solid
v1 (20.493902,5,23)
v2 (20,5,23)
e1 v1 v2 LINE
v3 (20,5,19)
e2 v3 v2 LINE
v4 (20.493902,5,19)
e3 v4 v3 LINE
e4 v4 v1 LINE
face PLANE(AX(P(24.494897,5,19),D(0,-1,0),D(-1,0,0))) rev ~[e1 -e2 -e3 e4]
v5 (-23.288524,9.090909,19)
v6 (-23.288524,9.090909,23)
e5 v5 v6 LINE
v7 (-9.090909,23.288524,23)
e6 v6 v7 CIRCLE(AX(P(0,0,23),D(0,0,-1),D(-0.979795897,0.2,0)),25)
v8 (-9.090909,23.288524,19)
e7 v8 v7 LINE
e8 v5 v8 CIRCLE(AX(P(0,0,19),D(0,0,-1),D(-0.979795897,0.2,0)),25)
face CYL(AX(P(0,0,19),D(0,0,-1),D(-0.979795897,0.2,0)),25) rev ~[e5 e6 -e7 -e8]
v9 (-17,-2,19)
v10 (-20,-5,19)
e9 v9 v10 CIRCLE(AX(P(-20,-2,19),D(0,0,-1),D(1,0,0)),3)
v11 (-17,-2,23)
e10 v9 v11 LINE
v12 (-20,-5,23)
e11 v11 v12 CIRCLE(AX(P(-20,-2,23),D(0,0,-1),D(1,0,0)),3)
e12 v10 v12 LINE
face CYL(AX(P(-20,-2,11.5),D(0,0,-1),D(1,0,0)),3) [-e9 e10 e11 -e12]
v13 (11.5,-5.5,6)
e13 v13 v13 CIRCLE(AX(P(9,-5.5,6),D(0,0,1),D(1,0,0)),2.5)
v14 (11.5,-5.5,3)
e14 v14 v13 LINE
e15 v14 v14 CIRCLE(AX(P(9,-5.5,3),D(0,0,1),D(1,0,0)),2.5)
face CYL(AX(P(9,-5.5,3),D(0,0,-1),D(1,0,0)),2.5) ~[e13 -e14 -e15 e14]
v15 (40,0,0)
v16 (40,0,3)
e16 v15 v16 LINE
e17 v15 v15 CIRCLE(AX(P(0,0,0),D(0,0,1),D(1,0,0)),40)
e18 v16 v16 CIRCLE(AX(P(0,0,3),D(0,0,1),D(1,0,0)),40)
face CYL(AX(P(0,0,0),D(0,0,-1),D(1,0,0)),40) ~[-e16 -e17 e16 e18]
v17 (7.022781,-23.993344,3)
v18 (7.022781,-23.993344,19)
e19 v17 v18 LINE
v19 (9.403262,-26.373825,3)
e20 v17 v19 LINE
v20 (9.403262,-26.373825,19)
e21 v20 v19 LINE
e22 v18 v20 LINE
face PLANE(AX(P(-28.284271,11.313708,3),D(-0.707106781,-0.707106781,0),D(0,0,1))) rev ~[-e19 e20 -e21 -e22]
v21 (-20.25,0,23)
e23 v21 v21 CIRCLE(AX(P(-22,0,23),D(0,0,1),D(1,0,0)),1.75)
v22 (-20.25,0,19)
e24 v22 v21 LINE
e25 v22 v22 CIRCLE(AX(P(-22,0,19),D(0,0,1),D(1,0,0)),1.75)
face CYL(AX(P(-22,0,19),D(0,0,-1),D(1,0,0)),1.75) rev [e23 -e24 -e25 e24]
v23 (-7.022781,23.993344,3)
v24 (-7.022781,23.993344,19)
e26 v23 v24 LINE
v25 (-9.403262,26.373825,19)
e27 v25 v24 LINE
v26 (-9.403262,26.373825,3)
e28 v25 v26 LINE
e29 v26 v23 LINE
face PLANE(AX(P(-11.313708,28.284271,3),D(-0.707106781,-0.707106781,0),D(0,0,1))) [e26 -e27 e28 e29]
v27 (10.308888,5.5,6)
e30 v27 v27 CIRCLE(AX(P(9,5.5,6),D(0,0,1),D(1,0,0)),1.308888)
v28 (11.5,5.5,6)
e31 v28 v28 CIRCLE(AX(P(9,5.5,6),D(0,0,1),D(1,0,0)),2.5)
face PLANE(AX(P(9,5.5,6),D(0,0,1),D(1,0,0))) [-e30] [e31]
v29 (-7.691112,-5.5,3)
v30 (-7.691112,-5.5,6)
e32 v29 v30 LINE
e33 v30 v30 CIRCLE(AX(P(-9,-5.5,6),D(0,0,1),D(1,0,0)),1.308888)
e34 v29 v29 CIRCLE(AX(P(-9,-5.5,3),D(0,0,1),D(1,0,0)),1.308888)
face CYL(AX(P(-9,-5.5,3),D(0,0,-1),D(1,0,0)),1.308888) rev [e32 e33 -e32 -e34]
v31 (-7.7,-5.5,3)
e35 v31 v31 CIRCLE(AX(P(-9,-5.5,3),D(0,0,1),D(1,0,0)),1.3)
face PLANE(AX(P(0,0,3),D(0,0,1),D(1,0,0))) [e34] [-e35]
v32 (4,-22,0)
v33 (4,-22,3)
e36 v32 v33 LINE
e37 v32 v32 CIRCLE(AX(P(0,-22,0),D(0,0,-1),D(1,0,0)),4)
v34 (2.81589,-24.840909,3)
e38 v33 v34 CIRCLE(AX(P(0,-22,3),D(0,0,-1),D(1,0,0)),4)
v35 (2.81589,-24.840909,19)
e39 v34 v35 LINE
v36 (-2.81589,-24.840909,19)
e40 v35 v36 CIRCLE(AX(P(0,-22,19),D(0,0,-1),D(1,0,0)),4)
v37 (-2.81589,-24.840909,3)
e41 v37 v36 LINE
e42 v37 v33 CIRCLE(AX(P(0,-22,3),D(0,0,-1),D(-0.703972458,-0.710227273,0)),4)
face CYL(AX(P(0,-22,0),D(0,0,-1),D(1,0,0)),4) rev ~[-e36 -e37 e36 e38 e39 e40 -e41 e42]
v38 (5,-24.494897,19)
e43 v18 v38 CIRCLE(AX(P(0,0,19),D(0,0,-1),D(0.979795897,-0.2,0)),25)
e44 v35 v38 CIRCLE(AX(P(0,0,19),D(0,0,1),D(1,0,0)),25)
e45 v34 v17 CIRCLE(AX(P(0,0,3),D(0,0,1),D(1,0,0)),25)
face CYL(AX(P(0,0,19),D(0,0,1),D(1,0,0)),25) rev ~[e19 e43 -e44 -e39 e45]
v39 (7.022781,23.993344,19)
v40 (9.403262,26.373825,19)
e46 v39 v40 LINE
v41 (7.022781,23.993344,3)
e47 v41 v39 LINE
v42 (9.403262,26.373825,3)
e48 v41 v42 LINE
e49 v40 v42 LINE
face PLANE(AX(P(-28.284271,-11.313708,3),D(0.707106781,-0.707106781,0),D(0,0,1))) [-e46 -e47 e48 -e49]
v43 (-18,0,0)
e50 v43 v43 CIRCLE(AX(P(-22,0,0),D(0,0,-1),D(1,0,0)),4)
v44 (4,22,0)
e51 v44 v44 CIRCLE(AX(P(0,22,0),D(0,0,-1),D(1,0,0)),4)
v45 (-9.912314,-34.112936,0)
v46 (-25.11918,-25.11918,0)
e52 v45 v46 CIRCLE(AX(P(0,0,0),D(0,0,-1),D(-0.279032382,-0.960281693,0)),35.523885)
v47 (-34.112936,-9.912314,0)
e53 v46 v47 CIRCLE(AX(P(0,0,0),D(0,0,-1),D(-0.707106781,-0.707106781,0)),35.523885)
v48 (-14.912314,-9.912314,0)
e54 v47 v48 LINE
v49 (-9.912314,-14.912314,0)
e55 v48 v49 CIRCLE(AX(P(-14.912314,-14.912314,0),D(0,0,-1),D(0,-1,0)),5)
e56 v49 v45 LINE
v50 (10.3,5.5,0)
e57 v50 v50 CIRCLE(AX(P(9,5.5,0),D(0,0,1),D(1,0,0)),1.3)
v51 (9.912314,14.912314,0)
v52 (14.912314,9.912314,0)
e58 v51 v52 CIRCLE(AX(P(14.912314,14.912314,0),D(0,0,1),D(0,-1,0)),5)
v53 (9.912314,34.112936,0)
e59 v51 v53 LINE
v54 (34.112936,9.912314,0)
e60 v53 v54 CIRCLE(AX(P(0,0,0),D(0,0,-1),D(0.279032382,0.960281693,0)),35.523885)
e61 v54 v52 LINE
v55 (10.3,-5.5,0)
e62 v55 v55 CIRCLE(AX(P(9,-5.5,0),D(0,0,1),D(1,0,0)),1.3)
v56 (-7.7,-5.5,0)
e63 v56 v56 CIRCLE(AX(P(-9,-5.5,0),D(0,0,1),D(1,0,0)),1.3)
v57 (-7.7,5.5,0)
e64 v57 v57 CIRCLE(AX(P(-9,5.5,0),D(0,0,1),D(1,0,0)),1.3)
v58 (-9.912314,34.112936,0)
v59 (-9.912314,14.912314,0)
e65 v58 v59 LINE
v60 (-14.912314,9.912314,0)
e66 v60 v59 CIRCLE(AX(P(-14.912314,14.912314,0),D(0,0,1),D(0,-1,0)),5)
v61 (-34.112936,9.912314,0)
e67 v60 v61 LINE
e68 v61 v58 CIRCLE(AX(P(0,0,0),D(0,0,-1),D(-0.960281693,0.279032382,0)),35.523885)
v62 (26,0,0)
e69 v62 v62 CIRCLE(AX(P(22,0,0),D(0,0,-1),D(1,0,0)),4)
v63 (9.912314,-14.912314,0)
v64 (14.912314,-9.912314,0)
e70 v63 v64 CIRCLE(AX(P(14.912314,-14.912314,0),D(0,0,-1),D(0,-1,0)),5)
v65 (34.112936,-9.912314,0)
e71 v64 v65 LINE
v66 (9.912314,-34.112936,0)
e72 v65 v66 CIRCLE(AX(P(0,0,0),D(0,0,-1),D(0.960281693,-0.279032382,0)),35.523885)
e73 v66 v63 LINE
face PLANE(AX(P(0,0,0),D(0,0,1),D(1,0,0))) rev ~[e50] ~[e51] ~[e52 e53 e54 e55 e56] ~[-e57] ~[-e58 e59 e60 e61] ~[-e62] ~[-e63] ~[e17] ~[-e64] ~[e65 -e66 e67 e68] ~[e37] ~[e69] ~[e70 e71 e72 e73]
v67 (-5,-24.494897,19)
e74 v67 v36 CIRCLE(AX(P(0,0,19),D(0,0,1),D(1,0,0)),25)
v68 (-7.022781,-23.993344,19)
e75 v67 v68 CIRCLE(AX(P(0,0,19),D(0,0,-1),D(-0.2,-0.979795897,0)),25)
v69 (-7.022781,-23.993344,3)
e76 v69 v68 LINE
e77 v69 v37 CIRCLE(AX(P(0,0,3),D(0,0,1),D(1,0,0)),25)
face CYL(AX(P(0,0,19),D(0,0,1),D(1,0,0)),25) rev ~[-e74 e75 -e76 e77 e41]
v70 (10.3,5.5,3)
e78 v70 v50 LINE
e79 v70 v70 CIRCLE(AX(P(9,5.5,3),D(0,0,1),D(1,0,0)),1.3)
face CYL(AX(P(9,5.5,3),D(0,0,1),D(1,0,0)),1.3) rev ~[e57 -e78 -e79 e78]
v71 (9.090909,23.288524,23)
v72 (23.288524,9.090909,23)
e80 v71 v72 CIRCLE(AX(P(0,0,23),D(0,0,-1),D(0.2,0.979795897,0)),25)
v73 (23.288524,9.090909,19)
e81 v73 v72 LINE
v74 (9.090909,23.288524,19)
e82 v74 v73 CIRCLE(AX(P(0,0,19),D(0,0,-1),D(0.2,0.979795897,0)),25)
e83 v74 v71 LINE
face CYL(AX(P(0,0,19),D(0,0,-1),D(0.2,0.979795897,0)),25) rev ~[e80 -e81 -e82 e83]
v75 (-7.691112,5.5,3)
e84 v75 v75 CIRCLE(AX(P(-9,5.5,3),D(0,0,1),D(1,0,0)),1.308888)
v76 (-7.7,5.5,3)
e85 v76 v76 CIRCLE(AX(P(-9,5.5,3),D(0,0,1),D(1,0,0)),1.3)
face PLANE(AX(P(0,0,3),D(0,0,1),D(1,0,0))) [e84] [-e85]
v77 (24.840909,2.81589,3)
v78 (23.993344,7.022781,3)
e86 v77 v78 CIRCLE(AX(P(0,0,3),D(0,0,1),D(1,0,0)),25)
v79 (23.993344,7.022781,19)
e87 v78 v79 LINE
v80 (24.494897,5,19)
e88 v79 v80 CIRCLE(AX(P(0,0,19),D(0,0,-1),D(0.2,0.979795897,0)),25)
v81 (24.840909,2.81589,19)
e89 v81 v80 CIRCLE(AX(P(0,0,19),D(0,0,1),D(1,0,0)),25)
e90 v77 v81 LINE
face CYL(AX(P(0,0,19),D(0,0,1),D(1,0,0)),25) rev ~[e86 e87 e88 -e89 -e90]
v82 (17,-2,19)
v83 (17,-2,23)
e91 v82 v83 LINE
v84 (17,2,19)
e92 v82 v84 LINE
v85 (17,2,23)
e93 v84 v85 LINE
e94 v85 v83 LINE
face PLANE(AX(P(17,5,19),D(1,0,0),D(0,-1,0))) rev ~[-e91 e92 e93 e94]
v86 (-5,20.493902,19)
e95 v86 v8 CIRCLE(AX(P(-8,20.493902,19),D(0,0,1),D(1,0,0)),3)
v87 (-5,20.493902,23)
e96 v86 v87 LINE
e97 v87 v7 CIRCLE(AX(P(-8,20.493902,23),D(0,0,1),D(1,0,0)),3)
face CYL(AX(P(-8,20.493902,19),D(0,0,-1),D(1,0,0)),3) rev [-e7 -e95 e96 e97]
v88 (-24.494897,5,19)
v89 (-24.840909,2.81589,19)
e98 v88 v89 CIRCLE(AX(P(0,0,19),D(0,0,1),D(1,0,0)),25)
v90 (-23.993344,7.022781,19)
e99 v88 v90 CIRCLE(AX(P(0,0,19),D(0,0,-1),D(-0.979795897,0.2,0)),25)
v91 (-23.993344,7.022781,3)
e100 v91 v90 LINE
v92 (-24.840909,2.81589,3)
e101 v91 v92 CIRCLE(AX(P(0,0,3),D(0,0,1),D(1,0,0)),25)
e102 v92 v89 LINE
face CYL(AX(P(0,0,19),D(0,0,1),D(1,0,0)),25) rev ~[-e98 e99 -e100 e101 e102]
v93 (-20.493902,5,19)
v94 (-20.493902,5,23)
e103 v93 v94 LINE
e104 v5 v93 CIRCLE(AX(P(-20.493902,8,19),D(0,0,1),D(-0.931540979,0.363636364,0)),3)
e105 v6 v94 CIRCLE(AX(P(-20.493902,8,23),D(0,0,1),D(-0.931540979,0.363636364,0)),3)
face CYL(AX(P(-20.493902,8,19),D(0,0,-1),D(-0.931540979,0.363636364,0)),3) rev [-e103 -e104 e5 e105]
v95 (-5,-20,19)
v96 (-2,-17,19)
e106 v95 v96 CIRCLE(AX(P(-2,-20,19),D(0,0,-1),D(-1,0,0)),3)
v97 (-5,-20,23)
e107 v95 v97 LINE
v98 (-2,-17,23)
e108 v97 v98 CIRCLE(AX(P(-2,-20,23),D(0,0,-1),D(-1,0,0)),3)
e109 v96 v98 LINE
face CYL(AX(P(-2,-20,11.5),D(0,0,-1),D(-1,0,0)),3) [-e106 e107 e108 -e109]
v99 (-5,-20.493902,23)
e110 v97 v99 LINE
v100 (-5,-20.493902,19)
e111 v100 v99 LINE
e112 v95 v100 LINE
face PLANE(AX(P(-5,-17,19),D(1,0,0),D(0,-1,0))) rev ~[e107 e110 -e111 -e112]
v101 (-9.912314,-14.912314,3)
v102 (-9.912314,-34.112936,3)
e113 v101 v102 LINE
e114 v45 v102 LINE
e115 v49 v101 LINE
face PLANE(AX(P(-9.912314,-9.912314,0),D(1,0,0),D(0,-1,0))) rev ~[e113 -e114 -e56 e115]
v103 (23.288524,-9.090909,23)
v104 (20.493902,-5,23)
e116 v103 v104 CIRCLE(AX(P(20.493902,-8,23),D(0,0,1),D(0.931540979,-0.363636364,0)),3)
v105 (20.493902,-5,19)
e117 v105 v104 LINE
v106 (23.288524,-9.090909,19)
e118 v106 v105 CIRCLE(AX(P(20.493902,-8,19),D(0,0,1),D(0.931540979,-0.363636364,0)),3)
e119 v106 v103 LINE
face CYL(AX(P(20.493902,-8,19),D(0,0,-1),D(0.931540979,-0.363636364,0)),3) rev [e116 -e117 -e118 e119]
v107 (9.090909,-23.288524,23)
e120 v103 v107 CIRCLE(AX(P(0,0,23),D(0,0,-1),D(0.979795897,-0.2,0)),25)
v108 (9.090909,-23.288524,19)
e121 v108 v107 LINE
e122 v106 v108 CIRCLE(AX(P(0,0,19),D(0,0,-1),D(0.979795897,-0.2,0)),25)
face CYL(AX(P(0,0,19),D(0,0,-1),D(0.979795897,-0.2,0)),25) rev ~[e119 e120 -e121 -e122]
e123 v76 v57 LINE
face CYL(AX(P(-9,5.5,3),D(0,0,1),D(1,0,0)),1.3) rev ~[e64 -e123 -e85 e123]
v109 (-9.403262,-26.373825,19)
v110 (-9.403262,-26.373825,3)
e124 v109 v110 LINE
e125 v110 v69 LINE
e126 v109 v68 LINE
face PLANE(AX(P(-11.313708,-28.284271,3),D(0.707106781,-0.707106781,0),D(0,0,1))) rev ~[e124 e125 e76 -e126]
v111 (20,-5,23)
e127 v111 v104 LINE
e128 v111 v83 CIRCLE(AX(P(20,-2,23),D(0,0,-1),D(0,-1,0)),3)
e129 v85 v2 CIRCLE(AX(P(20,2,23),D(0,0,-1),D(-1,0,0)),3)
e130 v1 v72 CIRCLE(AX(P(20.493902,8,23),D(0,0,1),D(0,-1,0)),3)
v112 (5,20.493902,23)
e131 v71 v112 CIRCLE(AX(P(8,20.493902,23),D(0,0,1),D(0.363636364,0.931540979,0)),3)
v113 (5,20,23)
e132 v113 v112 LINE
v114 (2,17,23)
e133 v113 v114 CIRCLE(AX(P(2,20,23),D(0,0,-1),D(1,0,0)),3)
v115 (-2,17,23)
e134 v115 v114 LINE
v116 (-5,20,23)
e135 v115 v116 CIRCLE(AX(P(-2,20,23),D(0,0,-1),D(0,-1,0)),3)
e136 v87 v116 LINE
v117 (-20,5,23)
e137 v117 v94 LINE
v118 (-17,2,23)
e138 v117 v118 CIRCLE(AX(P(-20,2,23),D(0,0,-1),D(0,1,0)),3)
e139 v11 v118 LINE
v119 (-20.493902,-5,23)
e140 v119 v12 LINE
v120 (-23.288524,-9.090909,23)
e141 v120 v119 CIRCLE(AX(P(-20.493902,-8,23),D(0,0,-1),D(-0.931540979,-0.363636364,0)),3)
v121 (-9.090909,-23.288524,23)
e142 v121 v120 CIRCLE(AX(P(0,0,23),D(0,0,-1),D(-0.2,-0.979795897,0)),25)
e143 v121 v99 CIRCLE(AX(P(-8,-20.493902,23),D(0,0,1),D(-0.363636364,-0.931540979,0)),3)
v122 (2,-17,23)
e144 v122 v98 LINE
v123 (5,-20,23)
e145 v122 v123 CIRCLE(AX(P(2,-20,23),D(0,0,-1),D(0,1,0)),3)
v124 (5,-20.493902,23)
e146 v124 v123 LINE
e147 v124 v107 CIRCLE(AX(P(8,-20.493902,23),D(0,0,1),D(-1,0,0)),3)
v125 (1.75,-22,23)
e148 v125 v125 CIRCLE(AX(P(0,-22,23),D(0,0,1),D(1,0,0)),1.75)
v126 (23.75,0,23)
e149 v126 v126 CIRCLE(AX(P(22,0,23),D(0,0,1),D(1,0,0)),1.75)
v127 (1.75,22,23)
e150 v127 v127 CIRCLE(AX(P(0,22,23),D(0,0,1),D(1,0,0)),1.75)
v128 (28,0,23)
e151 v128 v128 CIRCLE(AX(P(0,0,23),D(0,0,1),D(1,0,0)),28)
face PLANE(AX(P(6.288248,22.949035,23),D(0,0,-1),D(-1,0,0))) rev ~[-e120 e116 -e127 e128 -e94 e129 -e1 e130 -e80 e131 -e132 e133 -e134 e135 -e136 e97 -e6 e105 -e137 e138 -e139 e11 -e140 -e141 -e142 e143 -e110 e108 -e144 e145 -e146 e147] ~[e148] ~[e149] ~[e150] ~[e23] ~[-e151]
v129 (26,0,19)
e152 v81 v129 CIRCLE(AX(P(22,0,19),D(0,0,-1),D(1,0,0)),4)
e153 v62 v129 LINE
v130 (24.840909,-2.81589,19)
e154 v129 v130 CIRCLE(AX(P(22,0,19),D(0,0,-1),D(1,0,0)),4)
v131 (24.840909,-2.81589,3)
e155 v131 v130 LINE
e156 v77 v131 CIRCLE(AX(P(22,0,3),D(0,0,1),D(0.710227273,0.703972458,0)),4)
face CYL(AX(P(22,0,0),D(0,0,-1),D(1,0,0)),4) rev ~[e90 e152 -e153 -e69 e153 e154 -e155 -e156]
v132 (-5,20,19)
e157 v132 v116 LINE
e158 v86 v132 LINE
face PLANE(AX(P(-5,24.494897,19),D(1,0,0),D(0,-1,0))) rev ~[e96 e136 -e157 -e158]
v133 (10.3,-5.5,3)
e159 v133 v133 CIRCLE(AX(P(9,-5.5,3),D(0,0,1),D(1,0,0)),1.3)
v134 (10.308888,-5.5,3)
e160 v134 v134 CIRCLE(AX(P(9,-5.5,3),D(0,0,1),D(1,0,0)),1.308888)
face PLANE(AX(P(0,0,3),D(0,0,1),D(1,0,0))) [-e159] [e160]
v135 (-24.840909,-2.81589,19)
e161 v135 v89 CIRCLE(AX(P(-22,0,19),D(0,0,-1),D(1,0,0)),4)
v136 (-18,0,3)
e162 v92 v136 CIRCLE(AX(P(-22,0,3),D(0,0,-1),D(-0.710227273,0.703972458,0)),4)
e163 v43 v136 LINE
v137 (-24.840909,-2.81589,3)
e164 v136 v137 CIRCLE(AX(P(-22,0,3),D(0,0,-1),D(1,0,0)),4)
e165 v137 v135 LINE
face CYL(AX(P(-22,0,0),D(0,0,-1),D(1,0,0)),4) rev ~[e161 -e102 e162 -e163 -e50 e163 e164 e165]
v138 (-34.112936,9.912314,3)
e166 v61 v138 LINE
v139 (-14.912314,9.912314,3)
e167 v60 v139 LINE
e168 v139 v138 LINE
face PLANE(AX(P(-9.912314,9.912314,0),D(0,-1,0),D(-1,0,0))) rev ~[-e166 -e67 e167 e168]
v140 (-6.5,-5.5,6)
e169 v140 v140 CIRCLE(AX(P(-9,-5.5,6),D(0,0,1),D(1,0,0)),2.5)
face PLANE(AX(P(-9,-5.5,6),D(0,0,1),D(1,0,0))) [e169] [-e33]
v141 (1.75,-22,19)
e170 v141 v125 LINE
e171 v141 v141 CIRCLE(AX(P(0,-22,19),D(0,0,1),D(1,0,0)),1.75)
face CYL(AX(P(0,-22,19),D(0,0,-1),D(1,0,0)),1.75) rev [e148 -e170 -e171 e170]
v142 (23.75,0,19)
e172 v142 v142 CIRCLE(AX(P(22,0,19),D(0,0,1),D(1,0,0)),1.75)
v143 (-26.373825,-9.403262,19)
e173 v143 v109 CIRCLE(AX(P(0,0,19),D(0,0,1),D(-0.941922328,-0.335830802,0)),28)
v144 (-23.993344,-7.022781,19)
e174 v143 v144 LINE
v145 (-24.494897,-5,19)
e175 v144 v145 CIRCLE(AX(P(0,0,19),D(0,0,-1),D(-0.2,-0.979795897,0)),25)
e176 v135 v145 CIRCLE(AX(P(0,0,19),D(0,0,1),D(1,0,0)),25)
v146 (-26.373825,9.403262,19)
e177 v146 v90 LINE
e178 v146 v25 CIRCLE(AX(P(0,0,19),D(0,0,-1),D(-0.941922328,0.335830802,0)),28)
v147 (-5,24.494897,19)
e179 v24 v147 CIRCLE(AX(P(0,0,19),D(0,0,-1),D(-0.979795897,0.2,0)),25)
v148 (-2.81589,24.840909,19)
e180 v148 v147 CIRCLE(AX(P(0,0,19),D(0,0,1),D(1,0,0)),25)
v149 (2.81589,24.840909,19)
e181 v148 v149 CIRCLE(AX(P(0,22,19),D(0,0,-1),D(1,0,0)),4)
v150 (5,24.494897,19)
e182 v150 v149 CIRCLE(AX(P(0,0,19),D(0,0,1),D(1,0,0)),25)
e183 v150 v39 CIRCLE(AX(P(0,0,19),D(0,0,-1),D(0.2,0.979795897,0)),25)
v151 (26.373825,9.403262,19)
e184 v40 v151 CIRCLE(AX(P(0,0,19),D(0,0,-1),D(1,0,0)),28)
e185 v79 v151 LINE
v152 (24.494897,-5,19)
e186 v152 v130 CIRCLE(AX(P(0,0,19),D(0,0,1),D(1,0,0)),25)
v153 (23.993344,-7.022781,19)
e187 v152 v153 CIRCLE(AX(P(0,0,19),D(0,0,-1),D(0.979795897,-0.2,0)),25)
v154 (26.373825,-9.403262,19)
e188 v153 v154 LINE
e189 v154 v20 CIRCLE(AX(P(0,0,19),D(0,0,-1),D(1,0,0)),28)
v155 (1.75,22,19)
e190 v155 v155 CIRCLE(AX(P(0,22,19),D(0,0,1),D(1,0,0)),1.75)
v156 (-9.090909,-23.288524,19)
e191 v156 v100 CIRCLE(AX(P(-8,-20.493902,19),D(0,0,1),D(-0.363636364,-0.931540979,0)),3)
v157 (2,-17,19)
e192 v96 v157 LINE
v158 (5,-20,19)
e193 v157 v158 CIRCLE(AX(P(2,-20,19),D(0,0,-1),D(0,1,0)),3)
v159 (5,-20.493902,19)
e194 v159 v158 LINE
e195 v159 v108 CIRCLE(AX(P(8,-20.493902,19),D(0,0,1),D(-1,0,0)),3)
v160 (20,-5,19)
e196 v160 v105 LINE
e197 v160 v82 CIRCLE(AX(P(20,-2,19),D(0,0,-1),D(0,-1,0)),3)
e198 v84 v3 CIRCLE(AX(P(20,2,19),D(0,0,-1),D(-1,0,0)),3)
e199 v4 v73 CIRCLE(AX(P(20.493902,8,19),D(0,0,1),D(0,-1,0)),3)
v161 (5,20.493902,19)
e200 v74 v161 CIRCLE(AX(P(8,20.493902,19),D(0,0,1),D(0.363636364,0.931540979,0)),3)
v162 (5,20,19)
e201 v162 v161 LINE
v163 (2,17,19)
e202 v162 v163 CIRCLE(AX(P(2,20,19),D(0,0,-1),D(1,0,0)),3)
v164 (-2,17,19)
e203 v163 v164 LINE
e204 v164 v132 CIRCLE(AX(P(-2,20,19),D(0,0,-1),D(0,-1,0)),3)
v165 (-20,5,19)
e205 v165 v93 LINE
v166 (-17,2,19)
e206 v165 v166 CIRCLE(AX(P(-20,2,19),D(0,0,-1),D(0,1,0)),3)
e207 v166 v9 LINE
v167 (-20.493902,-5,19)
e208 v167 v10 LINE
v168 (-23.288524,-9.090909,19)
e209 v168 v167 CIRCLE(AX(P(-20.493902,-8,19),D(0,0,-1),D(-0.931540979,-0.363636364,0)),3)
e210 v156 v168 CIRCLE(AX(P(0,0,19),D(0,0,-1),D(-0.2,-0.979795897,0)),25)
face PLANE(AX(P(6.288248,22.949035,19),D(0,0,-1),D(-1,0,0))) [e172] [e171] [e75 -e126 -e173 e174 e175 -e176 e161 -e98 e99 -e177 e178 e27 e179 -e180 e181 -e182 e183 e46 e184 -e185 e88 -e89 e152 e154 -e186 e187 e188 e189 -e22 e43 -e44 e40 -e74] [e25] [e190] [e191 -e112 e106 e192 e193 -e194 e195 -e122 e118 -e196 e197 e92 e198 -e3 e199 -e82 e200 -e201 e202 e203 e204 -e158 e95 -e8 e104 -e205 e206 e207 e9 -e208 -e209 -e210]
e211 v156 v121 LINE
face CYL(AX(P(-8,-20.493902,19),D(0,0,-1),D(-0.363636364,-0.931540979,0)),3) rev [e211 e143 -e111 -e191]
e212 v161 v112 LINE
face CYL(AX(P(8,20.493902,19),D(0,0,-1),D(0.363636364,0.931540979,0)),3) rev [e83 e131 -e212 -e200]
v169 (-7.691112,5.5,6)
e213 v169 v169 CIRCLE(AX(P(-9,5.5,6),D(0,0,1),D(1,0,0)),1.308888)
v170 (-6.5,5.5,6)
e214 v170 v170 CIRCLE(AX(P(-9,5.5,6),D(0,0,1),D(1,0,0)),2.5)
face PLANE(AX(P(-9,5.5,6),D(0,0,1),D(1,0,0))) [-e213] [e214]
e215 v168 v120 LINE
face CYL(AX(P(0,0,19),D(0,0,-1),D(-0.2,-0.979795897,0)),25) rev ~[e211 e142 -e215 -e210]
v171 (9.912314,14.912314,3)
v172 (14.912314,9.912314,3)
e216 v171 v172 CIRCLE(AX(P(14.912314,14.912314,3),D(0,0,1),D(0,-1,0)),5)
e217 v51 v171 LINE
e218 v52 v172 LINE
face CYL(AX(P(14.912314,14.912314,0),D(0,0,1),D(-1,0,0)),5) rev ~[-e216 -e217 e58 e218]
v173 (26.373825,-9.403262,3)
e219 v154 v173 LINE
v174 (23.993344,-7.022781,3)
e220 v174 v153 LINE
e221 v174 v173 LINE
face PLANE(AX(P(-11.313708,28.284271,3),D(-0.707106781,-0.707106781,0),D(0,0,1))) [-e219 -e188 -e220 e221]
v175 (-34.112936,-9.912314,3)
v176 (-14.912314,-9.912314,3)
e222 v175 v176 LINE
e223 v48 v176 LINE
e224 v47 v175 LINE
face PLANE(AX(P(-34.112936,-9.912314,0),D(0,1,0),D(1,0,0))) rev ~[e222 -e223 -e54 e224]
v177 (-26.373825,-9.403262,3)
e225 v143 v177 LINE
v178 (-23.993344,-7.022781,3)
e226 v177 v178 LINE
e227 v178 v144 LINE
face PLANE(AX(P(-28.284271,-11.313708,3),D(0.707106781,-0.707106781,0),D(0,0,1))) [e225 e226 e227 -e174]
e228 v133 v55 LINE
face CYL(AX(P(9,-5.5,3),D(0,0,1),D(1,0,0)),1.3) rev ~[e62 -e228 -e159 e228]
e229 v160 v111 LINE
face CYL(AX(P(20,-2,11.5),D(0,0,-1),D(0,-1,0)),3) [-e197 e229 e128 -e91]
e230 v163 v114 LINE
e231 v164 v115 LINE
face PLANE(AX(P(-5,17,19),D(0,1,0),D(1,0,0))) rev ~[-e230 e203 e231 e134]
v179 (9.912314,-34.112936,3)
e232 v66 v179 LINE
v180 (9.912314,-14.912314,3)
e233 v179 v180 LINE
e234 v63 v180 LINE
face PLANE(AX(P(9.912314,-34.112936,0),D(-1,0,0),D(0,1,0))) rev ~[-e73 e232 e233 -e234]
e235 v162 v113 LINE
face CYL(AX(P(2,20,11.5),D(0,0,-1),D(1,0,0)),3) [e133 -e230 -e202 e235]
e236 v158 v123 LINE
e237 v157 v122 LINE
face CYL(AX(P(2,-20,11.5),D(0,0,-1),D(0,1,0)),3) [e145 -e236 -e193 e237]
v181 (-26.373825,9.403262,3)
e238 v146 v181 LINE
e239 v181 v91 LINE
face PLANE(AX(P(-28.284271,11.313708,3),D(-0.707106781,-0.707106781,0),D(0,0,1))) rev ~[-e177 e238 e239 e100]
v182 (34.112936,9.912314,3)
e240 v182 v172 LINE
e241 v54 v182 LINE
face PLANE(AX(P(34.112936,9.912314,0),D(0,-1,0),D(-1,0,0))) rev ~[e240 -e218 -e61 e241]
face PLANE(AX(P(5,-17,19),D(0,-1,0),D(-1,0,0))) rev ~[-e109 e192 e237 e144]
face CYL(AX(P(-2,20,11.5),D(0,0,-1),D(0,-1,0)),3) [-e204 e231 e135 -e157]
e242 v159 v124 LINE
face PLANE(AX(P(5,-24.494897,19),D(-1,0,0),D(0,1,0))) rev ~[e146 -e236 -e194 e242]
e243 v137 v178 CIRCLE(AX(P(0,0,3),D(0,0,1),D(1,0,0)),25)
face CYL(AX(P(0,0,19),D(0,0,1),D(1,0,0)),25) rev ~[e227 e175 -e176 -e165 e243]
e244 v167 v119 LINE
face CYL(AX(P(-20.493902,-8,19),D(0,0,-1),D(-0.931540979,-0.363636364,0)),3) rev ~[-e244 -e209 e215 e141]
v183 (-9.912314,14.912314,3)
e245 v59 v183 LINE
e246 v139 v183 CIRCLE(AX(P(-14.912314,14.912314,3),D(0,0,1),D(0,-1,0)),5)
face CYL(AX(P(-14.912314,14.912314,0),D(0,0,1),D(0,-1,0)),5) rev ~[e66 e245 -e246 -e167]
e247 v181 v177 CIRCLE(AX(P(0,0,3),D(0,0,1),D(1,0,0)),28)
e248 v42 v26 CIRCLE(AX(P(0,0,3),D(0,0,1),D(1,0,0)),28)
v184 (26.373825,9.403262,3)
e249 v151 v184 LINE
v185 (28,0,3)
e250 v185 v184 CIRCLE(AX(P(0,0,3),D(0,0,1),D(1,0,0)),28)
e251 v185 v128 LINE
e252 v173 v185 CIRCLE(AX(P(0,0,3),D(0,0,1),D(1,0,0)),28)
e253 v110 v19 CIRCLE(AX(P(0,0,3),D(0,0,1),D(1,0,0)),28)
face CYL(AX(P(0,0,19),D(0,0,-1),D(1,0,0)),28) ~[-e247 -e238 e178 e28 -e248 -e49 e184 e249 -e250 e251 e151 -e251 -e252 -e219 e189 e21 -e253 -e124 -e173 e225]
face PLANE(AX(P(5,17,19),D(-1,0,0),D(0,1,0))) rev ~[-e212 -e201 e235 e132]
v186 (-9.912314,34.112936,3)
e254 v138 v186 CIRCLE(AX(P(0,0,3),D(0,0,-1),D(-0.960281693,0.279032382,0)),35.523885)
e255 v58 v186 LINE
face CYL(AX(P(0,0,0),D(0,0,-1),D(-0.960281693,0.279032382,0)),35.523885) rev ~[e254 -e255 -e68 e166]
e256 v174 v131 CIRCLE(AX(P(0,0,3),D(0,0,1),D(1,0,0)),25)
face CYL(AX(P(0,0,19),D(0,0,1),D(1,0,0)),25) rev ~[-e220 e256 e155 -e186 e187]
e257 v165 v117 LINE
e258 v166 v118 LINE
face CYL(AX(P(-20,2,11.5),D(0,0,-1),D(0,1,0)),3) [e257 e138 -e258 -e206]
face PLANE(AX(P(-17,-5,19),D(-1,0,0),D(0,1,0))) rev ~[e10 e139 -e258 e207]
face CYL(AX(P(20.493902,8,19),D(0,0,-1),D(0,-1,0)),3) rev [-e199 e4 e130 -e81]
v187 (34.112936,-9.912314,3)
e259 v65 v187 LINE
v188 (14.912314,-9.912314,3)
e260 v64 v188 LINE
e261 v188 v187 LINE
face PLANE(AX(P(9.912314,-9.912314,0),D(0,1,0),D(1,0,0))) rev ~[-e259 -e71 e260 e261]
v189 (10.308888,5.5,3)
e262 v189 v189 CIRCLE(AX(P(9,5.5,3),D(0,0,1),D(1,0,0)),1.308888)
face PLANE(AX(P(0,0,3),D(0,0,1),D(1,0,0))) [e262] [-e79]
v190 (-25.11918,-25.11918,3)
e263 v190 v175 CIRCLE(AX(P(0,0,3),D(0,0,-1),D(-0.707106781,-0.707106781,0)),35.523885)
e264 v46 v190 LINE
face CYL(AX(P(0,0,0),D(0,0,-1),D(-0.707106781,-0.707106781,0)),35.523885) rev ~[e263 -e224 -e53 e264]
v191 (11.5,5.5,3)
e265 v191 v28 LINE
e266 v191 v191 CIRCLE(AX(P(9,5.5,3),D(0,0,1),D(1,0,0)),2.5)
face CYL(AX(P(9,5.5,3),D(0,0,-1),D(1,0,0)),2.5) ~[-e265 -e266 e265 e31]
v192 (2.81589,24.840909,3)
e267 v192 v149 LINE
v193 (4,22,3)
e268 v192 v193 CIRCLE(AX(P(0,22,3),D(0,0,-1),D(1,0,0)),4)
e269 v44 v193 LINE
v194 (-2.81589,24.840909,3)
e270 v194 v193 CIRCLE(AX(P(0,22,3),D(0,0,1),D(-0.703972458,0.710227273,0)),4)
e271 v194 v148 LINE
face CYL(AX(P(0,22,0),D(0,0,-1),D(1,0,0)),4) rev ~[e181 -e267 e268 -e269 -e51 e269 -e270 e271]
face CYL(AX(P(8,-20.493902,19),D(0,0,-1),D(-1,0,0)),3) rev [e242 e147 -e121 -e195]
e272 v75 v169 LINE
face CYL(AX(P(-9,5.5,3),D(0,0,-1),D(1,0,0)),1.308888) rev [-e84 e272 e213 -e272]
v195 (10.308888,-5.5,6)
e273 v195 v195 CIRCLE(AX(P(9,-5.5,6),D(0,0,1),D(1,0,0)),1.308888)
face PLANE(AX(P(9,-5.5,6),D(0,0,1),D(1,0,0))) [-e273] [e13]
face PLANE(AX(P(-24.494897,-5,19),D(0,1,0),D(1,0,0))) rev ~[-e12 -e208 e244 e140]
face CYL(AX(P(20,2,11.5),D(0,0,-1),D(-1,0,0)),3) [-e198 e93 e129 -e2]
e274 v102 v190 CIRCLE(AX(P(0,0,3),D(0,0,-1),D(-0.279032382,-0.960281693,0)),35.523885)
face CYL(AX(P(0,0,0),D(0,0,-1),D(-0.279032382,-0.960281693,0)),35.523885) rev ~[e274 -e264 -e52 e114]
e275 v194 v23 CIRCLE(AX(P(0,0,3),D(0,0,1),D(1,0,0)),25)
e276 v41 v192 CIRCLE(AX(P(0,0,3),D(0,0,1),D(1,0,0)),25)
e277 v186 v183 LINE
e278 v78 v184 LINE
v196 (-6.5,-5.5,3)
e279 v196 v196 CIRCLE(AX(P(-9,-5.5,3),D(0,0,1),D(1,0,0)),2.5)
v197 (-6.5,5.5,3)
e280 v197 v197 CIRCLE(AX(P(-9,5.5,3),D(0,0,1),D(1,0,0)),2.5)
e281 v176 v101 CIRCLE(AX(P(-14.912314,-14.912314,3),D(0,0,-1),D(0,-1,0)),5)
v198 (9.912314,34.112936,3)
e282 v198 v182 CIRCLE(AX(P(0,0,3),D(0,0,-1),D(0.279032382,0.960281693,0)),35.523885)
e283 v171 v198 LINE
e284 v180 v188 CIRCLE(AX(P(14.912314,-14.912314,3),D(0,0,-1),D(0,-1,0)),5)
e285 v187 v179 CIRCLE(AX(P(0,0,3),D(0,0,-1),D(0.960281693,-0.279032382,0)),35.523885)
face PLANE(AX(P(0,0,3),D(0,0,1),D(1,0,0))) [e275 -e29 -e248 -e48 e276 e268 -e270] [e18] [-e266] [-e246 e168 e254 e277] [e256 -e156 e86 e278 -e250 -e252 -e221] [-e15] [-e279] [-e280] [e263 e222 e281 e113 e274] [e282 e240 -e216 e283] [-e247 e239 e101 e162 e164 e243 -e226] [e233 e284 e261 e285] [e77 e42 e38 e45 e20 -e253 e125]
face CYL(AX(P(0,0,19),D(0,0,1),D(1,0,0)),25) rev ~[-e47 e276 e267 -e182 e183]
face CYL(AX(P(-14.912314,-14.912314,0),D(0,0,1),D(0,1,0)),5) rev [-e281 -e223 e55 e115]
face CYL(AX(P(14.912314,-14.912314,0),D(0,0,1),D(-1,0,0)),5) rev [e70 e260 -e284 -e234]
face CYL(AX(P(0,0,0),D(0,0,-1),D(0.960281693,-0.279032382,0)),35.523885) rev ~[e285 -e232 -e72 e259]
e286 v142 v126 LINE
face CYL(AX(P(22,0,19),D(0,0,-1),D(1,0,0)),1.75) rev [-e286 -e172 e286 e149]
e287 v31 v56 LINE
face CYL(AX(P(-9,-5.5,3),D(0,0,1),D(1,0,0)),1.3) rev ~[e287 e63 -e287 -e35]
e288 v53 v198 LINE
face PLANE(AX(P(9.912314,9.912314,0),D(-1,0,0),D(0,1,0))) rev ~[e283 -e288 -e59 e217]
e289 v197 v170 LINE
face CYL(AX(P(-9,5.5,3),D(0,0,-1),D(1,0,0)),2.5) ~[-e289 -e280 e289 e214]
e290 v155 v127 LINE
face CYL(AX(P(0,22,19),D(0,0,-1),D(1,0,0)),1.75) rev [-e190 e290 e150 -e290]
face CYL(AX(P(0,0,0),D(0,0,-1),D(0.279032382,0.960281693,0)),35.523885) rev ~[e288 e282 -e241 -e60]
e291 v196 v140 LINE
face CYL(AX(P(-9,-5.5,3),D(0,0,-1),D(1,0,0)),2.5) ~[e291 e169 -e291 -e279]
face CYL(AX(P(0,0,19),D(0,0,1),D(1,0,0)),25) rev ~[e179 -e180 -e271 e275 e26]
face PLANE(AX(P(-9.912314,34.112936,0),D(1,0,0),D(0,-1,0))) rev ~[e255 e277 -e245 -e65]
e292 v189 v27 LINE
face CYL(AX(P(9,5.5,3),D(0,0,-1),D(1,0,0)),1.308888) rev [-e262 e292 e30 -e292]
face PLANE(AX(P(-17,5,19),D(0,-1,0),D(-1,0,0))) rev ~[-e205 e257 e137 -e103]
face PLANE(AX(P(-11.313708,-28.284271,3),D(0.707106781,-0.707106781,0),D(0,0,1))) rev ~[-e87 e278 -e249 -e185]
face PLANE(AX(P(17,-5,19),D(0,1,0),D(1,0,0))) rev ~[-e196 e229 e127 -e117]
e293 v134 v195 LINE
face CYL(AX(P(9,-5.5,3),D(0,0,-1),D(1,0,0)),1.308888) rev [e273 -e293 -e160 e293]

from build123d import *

# Parameters (mm, degrees)
F0_R        = 40
F1_DEPTH    = 3
F2_R        = 28
F3_DEPTH    = 16
F4_R        = 25
F5_DEPTH    = 16
F6_R        = 28
F6_R_2      = 1.75
F7_DEPTH    = 4
F8_T1_DEPTH = 4
F8_T3_DEPTH = 19
F9_R        = 4
F10_DEPTH   = 19
F13_W       = 24
F13_H       = 16
F14_DEPTH   = 84.5695424949
F16_W       = 24
F16_H       = 16
F17_DEPTH   = 84.5695424949
F18_R       = 1.3
F19_DEPTH   = 3.001
F20_R       = 2.5
F20_R_2     = 1.3088878735
F21_DEPTH   = 3
F23_DEPTH   = 3
F24_R       = 5


# Not quite as in the source:
# - a fillet or chamfer that OpenCascade refuses, or shapes differently, is made with other operations: its cross-section is extruded or revolved along the edge and cut away or added
# - an extrude ends at something that could not be found from the text; its depth is read off the source's solid


with BuildPart() as f1:
    # F0 (on Top) → F1 (new body)
    with BuildSketch(Plane.XY):
        Circle(F0_R)
    extrude(amount=F1_DEPTH)

    # F2 (on face) → F3 (join)
    with BuildSketch(Plane.XY.offset(3)):
        Circle(F2_R)
    extrude(amount=F3_DEPTH)

    # F4 (on face) → F5 (cut)
    with BuildSketch(Plane.XY.offset(19)):
        Circle(F4_R)
    extrude(amount=-F5_DEPTH, mode=Mode.SUBTRACT)

    # F6 (on face) → F7 (join)
    with BuildSketch(Plane.XY.offset(19)):
        Circle(F6_R)
        with BuildLine():
            ThreePointArc((-5, 24.4948974278), (0, 25), (5, 24.4948974278))
            ThreePointArc((5, 24.4948974278), (17.6776695297, 17.6776695297), (24.4948974278, 5))
            ThreePointArc((24.4948974278, 5), (24.8734038251, 2.5127240501), (25, 0))
            ThreePointArc((25, 0), (24.8734038251, -2.5127240501), (24.4948974278, -5))
            ThreePointArc((24.4948974278, -5), (17.6776695297, -17.6776695297), (5, -24.4948974278))
            ThreePointArc((5, -24.4948974278), (0, -25), (-5, -24.4948974278))
            ThreePointArc((-5, -24.4948974278), (-17.6776695297, -17.6776695297), (-24.4948974278, -5))
            ThreePointArc((-24.4948974278, -5), (-25, 0), (-24.4948974278, 5))
            ThreePointArc((-24.4948974278, 5), (-17.6776695297, 17.6776695297), (-5, 24.4948974278))
        make_face(mode=Mode.SUBTRACT)
        with BuildLine():
            Line((-17, 5), (-24.4948974278, 5))
            ThreePointArc((-24.4948974278, 5), (-25, 0), (-24.4948974278, -5))
            Line((-24.4948974278, -5), (-17, -5))
            Line((-17, -5), (-17, 5))
        make_face()
        with Locations((-22, 0)):
            Circle(F6_R_2, mode=Mode.SUBTRACT)
        with BuildLine():
            Line((-5, 17), (5, 17))
            Line((5, 17), (5, 24.4948974278))
            ThreePointArc((5, 24.4948974278), (0, 25), (-5, 24.4948974278))
            Line((-5, 24.4948974278), (-5, 17))
        make_face()
        with Locations((0, 22)):
            Circle(F6_R_2, mode=Mode.SUBTRACT)
        with BuildLine():
            ThreePointArc((25, 0), (24.8734038251, 2.5127240501), (24.4948974278, 5))
            Line((24.4948974278, 5), (17, 5))
            Line((17, 5), (17, -5))
            Line((17, -5), (24.4948974278, -5))
            ThreePointArc((24.4948974278, -5), (24.8734038251, -2.5127240501), (25, 0))
        make_face()
        with Locations((22, 0)):
            Circle(F6_R_2, mode=Mode.SUBTRACT)
        with BuildLine():
            Line((-5, -17), (-5, -24.4948974278))
            ThreePointArc((-5, -24.4948974278), (0, -25), (5, -24.4948974278))
            Line((5, -24.4948974278), (5, -17))
            Line((5, -17), (-5, -17))
        make_face()
        with Locations((0, -22)):
            Circle(F6_R_2, mode=Mode.SUBTRACT)
    extrude(amount=F7_DEPTH)

    # F8: fillet of radius 3 on 16 edges, made by hand

    # F8_s2 → F8_t1 (join)
    with BuildSketch(Plane.XY.offset(19)):
        with BuildLine():
            ThreePointArc((9.0909090909, 23.2885244681), (6.3077717755, 22.9710700035), (5, 20.4939015319))
            Line((5, 20.4939015319), (5, 24.4948974278))
            ThreePointArc((5, 24.4948974278), (7.0712278765, 23.9791104155), (9.0909090909, 23.2885244681))
        make_face()
        with BuildLine():
            ThreePointArc((-5, 20.4939015319), (-6.3077717755, 22.9710700035), (-9.0909090909, 23.2885244681))
            ThreePointArc((-9.0909090909, 23.2885244681), (-7.0712278765, 23.9791104155), (-5, 24.4948974278))
            Line((-5, 24.4948974278), (-5, 20.4939015319))
        make_face()
        with BuildLine():
            ThreePointArc((-23.2885244681, 9.0909090909), (-22.9710700035, 6.3077717755), (-20.4939015319, 5))
            Line((-20.4939015319, 5), (-24.4948974278, 5))
            ThreePointArc((-24.4948974278, 5), (-23.9791104155, 7.0712278765), (-23.2885244681, 9.0909090909))
        make_face()
        with BuildLine():
            ThreePointArc((-23.2885244681, -9.0909090909), (-22.9710700035, -6.3077717755), (-20.4939015319, -5))
            Line((-20.4939015319, -5), (-24.4948974278, -5))
            ThreePointArc((-24.4948974278, -5), (-23.9791104155, -7.0712278765), (-23.2885244681, -9.0909090909))
        make_face()
        with BuildLine():
            ThreePointArc((20.4939015319, 5), (22.9710700035, 6.3077717755), (23.2885244681, 9.0909090909))
            ThreePointArc((23.2885244681, 9.0909090909), (23.9791104155, 7.0712278765), (24.4948974278, 5))
            Line((24.4948974278, 5), (20.4939015319, 5))
        make_face()
        with BuildLine():
            ThreePointArc((23.2885244681, -9.0909090909), (22.9710700035, -6.3077717755), (20.4939015319, -5))
            Line((20.4939015319, -5), (24.4948974278, -5))
            ThreePointArc((24.4948974278, -5), (23.9791104155, -7.0712278765), (23.2885244681, -9.0909090909))
        make_face()
        with BuildLine():
            ThreePointArc((-9.0909090909, -23.2885244681), (-6.3077717755, -22.9710700035), (-5, -20.4939015319))
            Line((-5, -20.4939015319), (-5, -24.4948974278))
            ThreePointArc((-5, -24.4948974278), (-7.0712278765, -23.9791104155), (-9.0909090909, -23.2885244681))
        make_face()
        with BuildLine():
            ThreePointArc((5, -20.4939015319), (6.3077717755, -22.9710700035), (9.0909090909, -23.2885244681))
            ThreePointArc((9.0909090909, -23.2885244681), (7.0712278765, -23.9791104155), (5, -24.4948974278))
            Line((5, -24.4948974278), (5, -20.4939015319))
        make_face()
    extrude(amount=F8_T1_DEPTH)

    # F8_s4 → F8_t3 (cut)
    with BuildSketch(Plane.XY.offset(11.5)):
        with BuildLine():
            ThreePointArc((-17, -2), (-17.8786796564, -4.1213203436), (-20, -5))
            Line((-20, -5), (-17, -5))
            Line((-17, -5), (-17, -2))
        make_face()
        with BuildLine():
            ThreePointArc((-20, 5), (-17.8786796564, 4.1213203436), (-17, 2))
            Line((-17, 2), (-17, 5))
            Line((-17, 5), (-20, 5))
        make_face()
        with BuildLine():
            ThreePointArc((-2, 17), (-4.1213203436, 17.8786796564), (-5, 20))
            Line((-5, 20), (-5, 17))
            Line((-5, 17), (-2, 17))
        make_face()
        with BuildLine():
            ThreePointArc((5, 20), (4.1213203436, 17.8786796564), (2, 17))
            Line((2, 17), (5, 17))
            Line((5, 17), (5, 20))
        make_face()
        with BuildLine():
            ThreePointArc((20, -5), (17.8786796564, -4.1213203436), (17, -2))
            Line((17, -2), (17, -5))
            Line((17, -5), (20, -5))
        make_face()
        with BuildLine():
            ThreePointArc((17, 2), (17.8786796564, 4.1213203436), (20, 5))
            Line((20, 5), (17, 5))
            Line((17, 5), (17, 2))
        make_face()
        with BuildLine():
            ThreePointArc((2, -17), (4.1213203436, -17.8786796564), (5, -20))
            Line((5, -20), (5, -17))
            Line((5, -17), (2, -17))
        make_face()
        with BuildLine():
            ThreePointArc((-5, -20), (-4.1213203436, -17.8786796564), (-2, -17))
            Line((-2, -17), (-5, -17))
            Line((-5, -17), (-5, -20))
        make_face()
    extrude(amount=F8_T3_DEPTH, mode=Mode.SUBTRACT)

    # F9 (on face) → F10 (cut, through all)
    with BuildSketch(Plane(origin=(0, 0, 0), x_dir=(1, 0, 0), z_dir=(0, 0, -1))):
        with Locations((0, 22)):
            Circle(F9_R)
        with Locations((-22, 0)):
            Circle(F9_R)
        with Locations((0, -22)):
            Circle(F9_R)
        with Locations((22, 0)):
            Circle(F9_R)
    extrude(amount=-F10_DEPTH, mode=Mode.SUBTRACT)

    # F13 (on line) → F14 (cut, through all)
    with BuildSketch(Plane(origin=(-19.7989898732, -19.7989898732, 0), x_dir=(0.7071067812, -0.7071067812, 0), z_dir=(-0.7071067812, -0.7071067812, 0))):
        with Locations((0, 11)):
            Rectangle(F13_W, F13_H)
    extrude(amount=-F14_DEPTH, mode=Mode.SUBTRACT)

    # F16 (on line) → F17 (cut, through all)
    with BuildSketch(Plane(origin=(-19.7989898732, 19.7989898732, 0), x_dir=(-0.7071067812, -0.7071067812, 0), z_dir=(-0.7071067812, 0.7071067812, 0))):
        with Locations((0, 11)):
            Rectangle(F16_W, F16_H)
    extrude(amount=-F17_DEPTH, mode=Mode.SUBTRACT)

    # F18 (on face) → F19 (cut, through all)
    with BuildSketch(Plane.XY.offset(3)):
        with Locations((-9, 5.5)):
            Circle(F18_R)
        with Locations((9, 5.5)):
            Circle(F18_R)
        with Locations((9, -5.5)):
            Circle(F18_R)
        with Locations((-9, -5.5)):
            Circle(F18_R)
    extrude(amount=-F19_DEPTH, mode=Mode.SUBTRACT)

    # F20 (on face) → F21 (join)
    with BuildSketch(Plane.XY.offset(3)):
        with Locations((-9, 5.5)):
            Circle(F20_R)
        with Locations((-9, 5.5)):
            Circle(F20_R_2, mode=Mode.SUBTRACT)
        with Locations((9, 5.5)):
            Circle(F20_R)
        with Locations((9, 5.5)):
            Circle(F20_R_2, mode=Mode.SUBTRACT)
        with Locations((-9, -5.5)):
            Circle(F20_R)
        with Locations((-9, -5.5)):
            Circle(F20_R_2, mode=Mode.SUBTRACT)
        with Locations((9, -5.5)):
            Circle(F20_R)
        with Locations((9, -5.5)):
            Circle(F20_R_2, mode=Mode.SUBTRACT)
    extrude(amount=F21_DEPTH)

    # F22 (on face) → F23 (cut, through all)
    with BuildSketch(Plane(origin=(0, 0, 0), x_dir=(1, 0, 0), z_dir=(0, 0, -1))):
        with BuildLine():
            Line((-9.9123141263, 9.9123141263), (-9.9123141263, 34.1129360408))
            ThreePointArc((-9.9123141263, 34.1129360408), (-18.0837856402, 30.5765117954), (-25.1191796906, 25.1191796906))
            Line((-25.1191796906, 25.1191796906), (-9.9123141263, 9.9123141263))
        make_face()
        with BuildLine():
            Line((-9.9123141263, 9.9123141263), (-25.1191796906, 25.1191796906))
            ThreePointArc((-25.1191796906, 25.1191796906), (-30.5765117954, 18.0837856402), (-34.1129360408, 9.9123141263))
            Line((-34.1129360408, 9.9123141263), (-9.9123141263, 9.9123141263))
        make_face()
        with BuildLine():
            Line((9.9123141263, 9.9123141263), (34.1129360408, 9.9123141263))
            ThreePointArc((34.1129360408, 9.9123141263), (25.1191796906, 25.1191796906), (9.9123141263, 34.1129360408))
            Line((9.9123141263, 34.1129360408), (9.9123141263, 9.9123141263))
        make_face()
        with BuildLine():
            ThreePointArc((9.9123141263, -34.1129360408), (25.1191796906, -25.1191796906), (34.1129360408, -9.9123141263))
            Line((34.1129360408, -9.9123141263), (9.9123141263, -9.9123141263))
            Line((9.9123141263, -9.9123141263), (9.9123141263, -34.1129360408))
        make_face()
        with BuildLine():
            ThreePointArc((-34.1129360408, -9.9123141263), (-25.1191796906, -25.1191796906), (-9.9123141263, -34.1129360408))
            Line((-9.9123141263, -34.1129360408), (-9.9123141263, -9.9123141263))
            Line((-9.9123141263, -9.9123141263), (-34.1129360408, -9.9123141263))
        make_face()
    extrude(amount=-F23_DEPTH, mode=Mode.SUBTRACT)

    # F24
    f24_edges = [f1.edges().sort_by_distance(p)[0] for p in [
        (9.912314, 9.912314, 1.5),
        (9.912314, -9.912314, 1.5),
        (-9.912314, 9.912314, 1.5),
        (-9.912314, -9.912314, 1.5),
    ]]
    fillet(f24_edges, radius=F24_R)


solid = f1.part
